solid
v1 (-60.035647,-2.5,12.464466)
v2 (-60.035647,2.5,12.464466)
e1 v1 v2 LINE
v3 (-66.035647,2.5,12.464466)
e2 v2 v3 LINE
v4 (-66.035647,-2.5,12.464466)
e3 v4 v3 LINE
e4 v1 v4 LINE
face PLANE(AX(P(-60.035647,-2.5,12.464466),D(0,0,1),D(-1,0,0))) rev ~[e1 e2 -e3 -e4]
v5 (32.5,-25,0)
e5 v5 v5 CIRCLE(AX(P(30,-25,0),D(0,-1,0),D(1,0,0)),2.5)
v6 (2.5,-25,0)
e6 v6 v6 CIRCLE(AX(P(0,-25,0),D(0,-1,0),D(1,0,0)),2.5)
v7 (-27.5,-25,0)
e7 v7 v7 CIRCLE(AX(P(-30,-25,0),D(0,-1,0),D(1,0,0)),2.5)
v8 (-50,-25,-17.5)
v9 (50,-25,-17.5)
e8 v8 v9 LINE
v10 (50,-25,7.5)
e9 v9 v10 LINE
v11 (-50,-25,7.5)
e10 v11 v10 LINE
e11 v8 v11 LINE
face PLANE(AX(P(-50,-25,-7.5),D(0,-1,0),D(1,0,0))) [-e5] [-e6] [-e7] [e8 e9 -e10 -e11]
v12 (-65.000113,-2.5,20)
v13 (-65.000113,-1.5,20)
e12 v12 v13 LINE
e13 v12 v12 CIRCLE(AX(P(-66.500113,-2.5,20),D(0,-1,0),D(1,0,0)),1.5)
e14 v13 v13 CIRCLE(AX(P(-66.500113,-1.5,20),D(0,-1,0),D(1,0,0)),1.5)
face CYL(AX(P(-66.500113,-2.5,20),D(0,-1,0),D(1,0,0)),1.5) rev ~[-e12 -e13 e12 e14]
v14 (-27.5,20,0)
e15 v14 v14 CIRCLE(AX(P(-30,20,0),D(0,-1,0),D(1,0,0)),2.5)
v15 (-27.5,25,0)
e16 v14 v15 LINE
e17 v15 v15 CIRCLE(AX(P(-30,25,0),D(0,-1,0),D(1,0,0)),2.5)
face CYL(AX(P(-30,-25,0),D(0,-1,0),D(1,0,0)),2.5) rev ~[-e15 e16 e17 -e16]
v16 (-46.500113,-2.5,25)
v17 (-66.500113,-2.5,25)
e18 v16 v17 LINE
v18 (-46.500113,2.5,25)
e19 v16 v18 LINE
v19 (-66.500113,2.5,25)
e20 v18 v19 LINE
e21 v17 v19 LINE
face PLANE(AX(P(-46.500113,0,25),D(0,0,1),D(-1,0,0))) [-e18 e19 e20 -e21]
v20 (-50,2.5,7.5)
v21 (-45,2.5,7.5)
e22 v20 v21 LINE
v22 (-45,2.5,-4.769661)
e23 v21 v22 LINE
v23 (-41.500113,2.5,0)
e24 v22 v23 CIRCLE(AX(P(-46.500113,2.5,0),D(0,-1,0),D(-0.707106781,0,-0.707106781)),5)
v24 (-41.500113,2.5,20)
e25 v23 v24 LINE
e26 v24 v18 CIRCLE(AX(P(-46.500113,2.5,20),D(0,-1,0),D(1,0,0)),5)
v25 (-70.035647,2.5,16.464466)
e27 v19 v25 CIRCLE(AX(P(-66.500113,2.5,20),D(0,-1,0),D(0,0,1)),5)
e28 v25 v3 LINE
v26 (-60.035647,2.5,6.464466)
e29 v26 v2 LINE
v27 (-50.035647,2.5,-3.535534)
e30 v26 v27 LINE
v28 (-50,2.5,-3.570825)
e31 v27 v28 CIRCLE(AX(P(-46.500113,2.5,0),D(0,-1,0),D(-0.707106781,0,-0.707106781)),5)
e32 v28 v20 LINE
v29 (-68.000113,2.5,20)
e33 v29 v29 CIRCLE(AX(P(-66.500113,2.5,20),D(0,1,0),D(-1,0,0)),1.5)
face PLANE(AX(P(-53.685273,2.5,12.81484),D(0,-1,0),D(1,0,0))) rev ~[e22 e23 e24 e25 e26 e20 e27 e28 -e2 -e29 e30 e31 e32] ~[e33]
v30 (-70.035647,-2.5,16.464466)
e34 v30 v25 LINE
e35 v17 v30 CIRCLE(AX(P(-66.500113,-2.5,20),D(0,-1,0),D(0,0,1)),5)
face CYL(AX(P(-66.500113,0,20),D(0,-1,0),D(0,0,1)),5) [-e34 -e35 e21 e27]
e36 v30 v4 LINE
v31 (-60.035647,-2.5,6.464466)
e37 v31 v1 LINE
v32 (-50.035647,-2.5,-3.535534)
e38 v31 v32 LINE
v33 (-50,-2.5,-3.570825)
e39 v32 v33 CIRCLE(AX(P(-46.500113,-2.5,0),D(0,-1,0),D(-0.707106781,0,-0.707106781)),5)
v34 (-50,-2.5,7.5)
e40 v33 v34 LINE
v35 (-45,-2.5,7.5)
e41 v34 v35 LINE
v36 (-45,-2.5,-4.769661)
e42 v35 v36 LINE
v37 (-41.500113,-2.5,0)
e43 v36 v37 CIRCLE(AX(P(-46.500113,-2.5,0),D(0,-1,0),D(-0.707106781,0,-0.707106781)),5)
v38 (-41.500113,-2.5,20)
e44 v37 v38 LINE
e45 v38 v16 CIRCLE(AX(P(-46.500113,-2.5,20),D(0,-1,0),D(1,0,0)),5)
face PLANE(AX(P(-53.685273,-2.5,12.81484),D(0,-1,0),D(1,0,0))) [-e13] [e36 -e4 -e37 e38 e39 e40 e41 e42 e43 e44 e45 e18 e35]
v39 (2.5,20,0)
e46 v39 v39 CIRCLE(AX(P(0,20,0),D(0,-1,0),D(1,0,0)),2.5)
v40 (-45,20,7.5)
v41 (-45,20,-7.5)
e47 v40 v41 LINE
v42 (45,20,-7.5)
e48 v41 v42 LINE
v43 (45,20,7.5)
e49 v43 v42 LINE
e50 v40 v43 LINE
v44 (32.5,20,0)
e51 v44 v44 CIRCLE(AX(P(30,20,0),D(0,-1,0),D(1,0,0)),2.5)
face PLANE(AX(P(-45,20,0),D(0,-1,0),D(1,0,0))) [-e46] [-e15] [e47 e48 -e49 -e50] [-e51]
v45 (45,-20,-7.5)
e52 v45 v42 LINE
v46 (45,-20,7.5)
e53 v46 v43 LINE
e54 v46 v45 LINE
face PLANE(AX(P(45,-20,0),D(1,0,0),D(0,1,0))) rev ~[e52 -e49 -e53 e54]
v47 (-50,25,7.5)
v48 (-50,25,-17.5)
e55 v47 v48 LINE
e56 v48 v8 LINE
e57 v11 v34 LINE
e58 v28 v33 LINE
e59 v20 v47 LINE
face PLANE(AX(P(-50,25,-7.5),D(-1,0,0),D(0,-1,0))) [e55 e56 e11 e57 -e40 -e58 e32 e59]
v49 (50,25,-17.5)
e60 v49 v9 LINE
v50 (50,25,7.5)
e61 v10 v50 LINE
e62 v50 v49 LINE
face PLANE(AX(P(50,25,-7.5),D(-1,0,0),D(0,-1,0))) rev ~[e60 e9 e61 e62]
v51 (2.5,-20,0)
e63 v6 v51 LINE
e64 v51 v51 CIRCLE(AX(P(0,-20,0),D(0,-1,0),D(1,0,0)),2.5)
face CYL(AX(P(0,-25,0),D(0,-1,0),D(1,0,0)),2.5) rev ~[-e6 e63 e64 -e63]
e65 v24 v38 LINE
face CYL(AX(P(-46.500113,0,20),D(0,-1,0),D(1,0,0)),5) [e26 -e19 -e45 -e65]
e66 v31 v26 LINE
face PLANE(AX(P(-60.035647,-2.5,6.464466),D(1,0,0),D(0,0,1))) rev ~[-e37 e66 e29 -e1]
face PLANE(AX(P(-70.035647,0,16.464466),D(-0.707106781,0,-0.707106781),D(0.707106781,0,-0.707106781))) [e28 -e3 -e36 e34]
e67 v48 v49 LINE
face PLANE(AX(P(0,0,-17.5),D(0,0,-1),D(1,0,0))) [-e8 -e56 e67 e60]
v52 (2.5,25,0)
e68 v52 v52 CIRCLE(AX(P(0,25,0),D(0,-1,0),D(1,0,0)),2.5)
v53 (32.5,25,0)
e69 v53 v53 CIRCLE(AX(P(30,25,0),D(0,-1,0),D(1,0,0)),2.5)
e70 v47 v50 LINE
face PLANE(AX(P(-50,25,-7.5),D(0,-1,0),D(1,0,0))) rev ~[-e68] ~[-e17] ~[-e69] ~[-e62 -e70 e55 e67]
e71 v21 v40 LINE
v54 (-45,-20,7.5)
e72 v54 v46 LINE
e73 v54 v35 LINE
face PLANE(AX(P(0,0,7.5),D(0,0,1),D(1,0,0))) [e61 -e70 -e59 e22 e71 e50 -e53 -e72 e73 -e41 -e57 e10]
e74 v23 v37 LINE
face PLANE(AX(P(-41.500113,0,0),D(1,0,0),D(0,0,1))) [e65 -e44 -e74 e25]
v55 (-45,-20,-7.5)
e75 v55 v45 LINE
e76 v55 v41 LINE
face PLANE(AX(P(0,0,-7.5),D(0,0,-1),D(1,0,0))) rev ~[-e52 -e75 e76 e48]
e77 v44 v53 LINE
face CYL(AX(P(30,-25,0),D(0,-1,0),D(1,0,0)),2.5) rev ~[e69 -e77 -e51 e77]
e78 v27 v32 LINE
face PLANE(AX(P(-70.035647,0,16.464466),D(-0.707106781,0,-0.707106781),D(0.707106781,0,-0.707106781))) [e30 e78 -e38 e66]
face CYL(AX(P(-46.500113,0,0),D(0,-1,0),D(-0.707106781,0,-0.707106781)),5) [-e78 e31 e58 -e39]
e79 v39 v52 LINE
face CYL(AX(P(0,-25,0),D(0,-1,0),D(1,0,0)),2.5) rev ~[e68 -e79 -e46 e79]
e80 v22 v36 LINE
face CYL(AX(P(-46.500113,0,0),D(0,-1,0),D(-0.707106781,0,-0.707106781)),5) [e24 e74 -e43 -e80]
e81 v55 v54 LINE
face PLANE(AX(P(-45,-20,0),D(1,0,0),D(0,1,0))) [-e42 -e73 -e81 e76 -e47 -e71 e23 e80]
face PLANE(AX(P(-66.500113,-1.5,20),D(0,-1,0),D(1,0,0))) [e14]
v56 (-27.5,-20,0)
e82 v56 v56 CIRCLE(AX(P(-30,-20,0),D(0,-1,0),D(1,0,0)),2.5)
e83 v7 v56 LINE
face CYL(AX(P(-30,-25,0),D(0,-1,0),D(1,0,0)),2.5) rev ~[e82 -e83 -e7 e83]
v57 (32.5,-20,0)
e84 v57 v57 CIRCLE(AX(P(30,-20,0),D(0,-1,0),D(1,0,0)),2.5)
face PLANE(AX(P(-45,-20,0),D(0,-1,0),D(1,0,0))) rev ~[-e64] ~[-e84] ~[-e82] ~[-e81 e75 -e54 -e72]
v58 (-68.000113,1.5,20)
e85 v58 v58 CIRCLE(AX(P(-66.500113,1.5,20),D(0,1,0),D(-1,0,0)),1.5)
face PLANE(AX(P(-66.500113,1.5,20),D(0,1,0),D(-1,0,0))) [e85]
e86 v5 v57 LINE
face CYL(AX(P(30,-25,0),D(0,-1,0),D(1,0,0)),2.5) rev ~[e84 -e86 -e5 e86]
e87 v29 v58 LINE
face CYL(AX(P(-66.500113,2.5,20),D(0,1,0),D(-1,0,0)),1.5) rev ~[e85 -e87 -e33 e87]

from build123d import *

# Parameters (mm, degrees)
F0_W      = 100
F0_H      = 50
F0_W_2    = 90
F0_H_2    = 40
F1_DEPTH  = 7.5
F2_R      = 2.5
F3_DEPTH  = 50.001
F4_W      = 100
F4_H      = 50
F4_W_2    = 90
F4_H_2    = 40
F5_DEPTH  = 10
F7_DEPTH  = 2.5
F8_R      = 1.5
F9_DEPTH  = 1
F10_R     = 1.5
F11_DEPTH = 1
F13_DEPTH = 27.501


with BuildPart() as f1:
    # F0 (on Top) → F1 (new body, symmetric)
    with BuildSketch(Plane.XY):
        Rectangle(F0_W, F0_H)
        Rectangle(F0_W_2, F0_H_2, mode=Mode.SUBTRACT)
    extrude(amount=F1_DEPTH, both=True)

    # F2 (on face) → F3 (cut, through all)
    with BuildSketch(Plane.XZ.offset(25)):
        Circle(F2_R)
        with Locations((-30, 0)):
            Circle(F2_R)
        with Locations((30, 0)):
            Circle(F2_R)
    extrude(amount=-F3_DEPTH, mode=Mode.SUBTRACT)

    # F4 (on face) → F5 (join)
    with BuildSketch(Plane(origin=(0, 0, -7.5), x_dir=(1, 0, 0), z_dir=(0, 0, -1))):
        Rectangle(F4_W, F4_H)
        Rectangle(F4_W_2, F4_H_2, mode=Mode.SUBTRACT)
        Rectangle(F4_W_2, F4_H_2)
    extrude(amount=F5_DEPTH)

    # F6 (on Front) → F7 (join, symmetric)
    with BuildSketch(Plane.XZ):
        with BuildLine():
            Line((-70.0356467673, 16.4644660941), (-50.0356467673, -3.5355339059))
            ThreePointArc((-50.0356467673, -3.5355339059), (-44.5866956996, -4.6193976626), (-41.5001128614, 0))
            Line((-41.5001128614, 0), (-41.5001128614, 20))
            ThreePointArc((-41.5001128614, 20), (-42.9645789555, 23.5355339059), (-46.5001128614, 25))
            Line((-46.5001128614, 25), (-66.5001128614, 25))
            ThreePointArc((-66.5001128614, 25), (-71.119510524, 21.9134171618), (-70.0356467673, 16.4644660941))
        make_face()
    extrude(amount=F7_DEPTH, both=True)

    # F8 (on face) → F9 (cut)
    with BuildSketch(Plane.XZ.offset(2.5)):
        with Locations((-66.5001128614, 20)):
            Circle(F8_R)
    extrude(amount=-F9_DEPTH, mode=Mode.SUBTRACT)

    # F10 (on face) → F11 (cut)
    with BuildSketch(Plane(origin=(0, 2.5, 0), x_dir=(-1, 0, 0), z_dir=(0, 1, 0))):
        with Locations((66.5001128614, 20)):
            Circle(F10_R)
    extrude(amount=-F11_DEPTH, mode=Mode.SUBTRACT)

    # F12 (on face) → F13 (cut, through all)
    with BuildSketch(Plane.XZ.offset(2.5)):
        Polygon((-60.0356467673, 12.4644660941), (-66.0356467673, 12.4644660941), (-60.0356467673, 6.4644660941), align=None)
    extrude(amount=-F13_DEPTH, mode=Mode.SUBTRACT)


solid = f1.part
